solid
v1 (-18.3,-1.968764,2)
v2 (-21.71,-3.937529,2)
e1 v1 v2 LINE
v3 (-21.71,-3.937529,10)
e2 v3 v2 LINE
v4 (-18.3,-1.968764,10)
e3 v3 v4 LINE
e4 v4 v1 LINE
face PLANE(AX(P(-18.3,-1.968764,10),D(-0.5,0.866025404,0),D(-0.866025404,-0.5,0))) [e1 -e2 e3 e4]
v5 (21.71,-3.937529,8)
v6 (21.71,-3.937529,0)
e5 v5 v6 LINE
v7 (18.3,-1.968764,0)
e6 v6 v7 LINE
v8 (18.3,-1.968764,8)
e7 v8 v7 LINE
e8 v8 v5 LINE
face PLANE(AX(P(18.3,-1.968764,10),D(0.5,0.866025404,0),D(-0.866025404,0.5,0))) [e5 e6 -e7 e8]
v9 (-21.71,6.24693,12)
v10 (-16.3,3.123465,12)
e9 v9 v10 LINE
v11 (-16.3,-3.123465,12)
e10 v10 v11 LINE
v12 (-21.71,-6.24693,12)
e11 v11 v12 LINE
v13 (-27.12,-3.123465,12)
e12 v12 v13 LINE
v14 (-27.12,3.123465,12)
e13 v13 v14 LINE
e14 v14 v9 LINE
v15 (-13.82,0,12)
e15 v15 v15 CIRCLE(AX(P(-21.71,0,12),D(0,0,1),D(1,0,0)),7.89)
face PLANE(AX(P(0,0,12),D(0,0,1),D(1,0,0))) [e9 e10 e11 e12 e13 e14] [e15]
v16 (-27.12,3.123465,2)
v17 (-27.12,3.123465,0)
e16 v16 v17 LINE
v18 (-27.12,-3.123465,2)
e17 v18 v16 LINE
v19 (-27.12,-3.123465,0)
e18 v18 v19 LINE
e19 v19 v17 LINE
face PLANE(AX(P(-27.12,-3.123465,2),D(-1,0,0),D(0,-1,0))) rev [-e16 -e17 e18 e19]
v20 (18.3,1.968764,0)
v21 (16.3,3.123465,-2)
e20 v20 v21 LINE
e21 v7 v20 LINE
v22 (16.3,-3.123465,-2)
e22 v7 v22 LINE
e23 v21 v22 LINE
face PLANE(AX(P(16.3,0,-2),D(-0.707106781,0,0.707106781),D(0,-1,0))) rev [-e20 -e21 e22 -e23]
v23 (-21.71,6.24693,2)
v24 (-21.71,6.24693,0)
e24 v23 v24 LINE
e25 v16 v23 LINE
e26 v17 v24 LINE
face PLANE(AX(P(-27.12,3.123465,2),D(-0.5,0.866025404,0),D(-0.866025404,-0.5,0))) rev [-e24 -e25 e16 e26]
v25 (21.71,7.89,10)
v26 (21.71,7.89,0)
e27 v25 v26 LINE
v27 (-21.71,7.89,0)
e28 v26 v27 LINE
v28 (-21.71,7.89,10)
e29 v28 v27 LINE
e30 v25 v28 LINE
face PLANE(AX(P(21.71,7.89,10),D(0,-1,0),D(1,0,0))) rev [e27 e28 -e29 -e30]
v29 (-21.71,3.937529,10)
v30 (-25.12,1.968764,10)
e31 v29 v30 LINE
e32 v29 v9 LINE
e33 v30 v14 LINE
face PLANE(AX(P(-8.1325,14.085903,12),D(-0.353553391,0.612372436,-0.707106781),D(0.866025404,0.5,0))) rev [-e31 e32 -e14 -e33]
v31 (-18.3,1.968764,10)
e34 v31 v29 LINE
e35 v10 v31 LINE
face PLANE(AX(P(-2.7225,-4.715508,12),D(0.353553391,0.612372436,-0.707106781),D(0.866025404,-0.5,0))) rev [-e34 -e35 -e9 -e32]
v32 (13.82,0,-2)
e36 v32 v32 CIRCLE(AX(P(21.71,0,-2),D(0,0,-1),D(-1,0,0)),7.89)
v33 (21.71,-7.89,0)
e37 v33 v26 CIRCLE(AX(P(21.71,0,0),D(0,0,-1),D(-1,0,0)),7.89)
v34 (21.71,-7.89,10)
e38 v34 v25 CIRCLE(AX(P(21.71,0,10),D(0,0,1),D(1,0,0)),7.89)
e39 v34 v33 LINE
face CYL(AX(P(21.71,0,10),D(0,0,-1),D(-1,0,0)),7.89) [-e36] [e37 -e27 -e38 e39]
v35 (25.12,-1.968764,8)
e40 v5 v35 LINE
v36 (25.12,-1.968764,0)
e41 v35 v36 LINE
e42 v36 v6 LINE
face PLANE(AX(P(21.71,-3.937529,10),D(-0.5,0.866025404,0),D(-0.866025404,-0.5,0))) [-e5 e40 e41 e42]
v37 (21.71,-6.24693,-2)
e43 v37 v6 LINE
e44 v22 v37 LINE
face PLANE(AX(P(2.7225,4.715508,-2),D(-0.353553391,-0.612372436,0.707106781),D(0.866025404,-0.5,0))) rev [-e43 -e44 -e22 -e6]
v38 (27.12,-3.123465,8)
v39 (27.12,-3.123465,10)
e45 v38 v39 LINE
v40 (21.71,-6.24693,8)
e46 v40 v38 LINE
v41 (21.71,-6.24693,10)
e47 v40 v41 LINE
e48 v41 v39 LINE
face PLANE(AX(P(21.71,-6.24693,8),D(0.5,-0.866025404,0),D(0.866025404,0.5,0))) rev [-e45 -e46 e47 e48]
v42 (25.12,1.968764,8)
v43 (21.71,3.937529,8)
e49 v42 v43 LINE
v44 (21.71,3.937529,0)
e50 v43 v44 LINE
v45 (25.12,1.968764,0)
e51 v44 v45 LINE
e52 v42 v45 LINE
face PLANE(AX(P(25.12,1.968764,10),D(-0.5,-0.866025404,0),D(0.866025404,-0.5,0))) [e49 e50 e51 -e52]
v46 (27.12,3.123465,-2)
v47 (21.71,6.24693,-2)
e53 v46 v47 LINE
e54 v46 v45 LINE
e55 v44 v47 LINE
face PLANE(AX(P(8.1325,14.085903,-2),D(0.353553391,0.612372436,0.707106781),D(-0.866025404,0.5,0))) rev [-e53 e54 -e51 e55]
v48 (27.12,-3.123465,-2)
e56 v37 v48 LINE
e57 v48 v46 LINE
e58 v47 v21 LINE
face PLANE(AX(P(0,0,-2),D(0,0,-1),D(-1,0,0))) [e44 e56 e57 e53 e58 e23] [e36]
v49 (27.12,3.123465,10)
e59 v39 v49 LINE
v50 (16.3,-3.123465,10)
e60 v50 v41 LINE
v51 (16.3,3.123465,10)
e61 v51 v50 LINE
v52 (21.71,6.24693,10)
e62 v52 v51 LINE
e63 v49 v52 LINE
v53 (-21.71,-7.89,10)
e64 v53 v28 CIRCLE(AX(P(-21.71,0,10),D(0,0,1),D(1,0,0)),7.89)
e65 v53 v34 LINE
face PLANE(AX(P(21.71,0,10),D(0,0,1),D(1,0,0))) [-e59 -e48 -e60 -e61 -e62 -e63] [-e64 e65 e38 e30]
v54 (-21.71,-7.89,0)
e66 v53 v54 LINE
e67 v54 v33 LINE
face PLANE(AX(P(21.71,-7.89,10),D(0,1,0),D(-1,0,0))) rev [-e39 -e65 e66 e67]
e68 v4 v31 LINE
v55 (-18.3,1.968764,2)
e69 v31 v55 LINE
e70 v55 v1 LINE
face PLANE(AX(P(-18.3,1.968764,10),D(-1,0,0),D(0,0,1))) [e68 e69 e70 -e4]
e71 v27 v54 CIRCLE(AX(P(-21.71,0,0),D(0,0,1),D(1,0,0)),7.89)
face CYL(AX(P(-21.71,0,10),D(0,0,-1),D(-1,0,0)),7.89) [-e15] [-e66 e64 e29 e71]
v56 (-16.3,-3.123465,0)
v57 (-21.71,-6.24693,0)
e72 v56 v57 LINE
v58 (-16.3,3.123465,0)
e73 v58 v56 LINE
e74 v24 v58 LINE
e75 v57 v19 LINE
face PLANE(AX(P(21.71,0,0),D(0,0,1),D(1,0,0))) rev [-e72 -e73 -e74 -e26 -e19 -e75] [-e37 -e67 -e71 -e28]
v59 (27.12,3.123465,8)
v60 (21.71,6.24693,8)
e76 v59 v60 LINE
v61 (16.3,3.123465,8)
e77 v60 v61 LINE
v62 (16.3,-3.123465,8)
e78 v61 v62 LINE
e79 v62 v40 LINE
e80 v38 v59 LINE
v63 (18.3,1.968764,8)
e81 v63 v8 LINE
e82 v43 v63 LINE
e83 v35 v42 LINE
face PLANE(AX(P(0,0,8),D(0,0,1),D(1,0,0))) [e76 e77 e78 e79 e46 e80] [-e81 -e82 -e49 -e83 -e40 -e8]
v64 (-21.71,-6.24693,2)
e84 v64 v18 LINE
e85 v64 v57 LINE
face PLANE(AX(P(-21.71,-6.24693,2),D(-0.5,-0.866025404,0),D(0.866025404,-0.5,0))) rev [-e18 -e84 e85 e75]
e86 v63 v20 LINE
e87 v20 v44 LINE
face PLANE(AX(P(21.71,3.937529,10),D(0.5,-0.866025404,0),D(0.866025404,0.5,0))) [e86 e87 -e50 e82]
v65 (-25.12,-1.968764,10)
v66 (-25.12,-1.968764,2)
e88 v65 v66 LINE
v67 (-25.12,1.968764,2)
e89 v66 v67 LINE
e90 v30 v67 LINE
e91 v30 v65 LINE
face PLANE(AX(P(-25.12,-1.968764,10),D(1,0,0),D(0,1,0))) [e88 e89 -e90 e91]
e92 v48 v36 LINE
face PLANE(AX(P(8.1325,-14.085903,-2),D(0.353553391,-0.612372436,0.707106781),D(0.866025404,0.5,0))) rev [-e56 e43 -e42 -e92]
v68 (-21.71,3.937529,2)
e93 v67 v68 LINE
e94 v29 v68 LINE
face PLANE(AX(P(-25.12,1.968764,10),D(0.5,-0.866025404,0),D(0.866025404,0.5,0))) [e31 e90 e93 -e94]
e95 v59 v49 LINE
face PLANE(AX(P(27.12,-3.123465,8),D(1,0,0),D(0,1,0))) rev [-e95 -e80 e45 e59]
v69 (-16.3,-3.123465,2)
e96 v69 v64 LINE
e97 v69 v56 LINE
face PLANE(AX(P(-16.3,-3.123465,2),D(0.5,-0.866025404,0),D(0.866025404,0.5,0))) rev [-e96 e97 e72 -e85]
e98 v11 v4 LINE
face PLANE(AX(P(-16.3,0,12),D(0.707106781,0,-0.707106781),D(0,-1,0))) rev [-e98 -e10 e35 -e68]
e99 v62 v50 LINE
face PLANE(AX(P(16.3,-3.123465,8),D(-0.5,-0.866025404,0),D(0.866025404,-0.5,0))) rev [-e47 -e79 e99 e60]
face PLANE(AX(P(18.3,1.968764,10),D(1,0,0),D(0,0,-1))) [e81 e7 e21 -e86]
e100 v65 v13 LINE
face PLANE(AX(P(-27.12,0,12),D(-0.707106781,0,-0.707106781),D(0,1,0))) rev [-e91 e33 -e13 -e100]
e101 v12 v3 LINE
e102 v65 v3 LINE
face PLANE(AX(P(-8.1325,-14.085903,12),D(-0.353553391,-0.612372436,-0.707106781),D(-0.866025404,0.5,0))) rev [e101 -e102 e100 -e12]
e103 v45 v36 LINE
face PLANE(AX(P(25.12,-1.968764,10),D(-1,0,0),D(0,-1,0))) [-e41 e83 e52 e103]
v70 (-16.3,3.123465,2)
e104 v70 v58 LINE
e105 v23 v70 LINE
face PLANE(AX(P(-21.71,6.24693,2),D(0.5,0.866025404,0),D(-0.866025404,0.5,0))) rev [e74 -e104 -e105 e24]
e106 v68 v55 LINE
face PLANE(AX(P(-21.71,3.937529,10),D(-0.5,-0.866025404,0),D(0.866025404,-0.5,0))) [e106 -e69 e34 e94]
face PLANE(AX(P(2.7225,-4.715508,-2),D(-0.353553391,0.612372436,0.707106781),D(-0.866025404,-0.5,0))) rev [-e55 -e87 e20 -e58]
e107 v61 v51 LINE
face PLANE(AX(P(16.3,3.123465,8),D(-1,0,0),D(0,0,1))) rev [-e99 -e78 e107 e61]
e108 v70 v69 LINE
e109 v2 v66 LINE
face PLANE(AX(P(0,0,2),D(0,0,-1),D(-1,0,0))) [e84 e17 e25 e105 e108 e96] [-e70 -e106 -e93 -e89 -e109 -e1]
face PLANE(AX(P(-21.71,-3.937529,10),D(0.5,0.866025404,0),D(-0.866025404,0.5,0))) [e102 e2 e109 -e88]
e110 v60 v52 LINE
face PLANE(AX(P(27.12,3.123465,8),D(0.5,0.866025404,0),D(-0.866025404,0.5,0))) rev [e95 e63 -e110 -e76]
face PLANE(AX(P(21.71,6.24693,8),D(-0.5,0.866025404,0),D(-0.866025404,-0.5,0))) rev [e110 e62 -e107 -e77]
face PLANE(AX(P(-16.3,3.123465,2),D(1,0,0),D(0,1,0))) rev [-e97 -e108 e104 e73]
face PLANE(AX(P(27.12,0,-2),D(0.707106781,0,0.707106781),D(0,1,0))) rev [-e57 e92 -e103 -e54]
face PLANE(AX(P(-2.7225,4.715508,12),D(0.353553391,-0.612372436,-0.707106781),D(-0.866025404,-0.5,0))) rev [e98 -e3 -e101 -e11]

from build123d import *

# Parameters (mm, degrees)
BOSS_EXTRU_1_DEPTH      = 10
BOSS_EXTRU_3_START      = 2
BOSS_EXTRU_3_DEPTH      = 2
BOSS_EXTRU_4_DEPTH      = 2
ENL_V_MAT_EXTRU_2_DEPTH = 2
ENL_V_MAT_EXTRU_3_DEPTH = 2
CHANFREIN1_SIZE         = 2


with BuildPart() as part:
    # Esquisse1 → Boss.-Extru.1 (new body)
    with BuildSketch(Plane(origin=(0, 0, 0), x_dir=(0, 1, 0), z_dir=(0, 0, 1))):
        with BuildLine():
            Line((-7.89, -21.71), (-7.89, 21.71))
            ThreePointArc((-7.89, 21.71), (0, 29.6), (7.89, 21.71))
            Line((7.89, 21.71), (7.89, -21.71))
            ThreePointArc((7.89, -21.71), (0, -29.6), (-7.89, -21.71))
        make_face()
        Polygon((-1.968764418, -18.3), (-3.937528836, -21.71), (-1.968764418, -25.12), (1.968764418, -25.12), (3.937528836, -21.71), (1.968764418, -18.3), align=None, mode=Mode.SUBTRACT)
        Polygon((1.968764418, 18.3), (-1.968764418, 18.3), (-3.937528836, 21.71), (-1.968764418, 25.12), (1.968764418, 25.12), (3.937528836, 21.71), align=None, mode=Mode.SUBTRACT)
    extrude(amount=BOSS_EXTRU_1_DEPTH)

    # Esquisse3 → Boss.-Extru.3 (add)
    with BuildSketch(Plane(origin=(0, 0, 0), x_dir=(1, 0, 0), z_dir=(0, 0, -1)).offset(BOSS_EXTRU_3_START)):
        with BuildLine():
            ThreePointArc((21.71, -7.89), (27.289072504, -5.579072504), (29.6, 0))
            ThreePointArc((29.6, 0), (27.289072504, 5.579072504), (21.71, 7.89))
            ThreePointArc((21.71, 7.89), (13.82, 0), (21.71, -7.89))
        make_face()
        Polygon((21.71, -3.937528836), (18.3, -1.968764418), (18.3, 1.968764418), (21.71, 3.937528836), (25.12, 1.968764418), (25.12, -1.968764418), align=None, mode=Mode.SUBTRACT)
    extrude(amount=-BOSS_EXTRU_3_DEPTH)

    # Esquisse4 → Boss.-Extru.4 (add)
    with BuildSketch(Plane.XY.offset(10)):
        with BuildLine():
            ThreePointArc((-21.71, -7.89), (-16.130927496, -5.579072504), (-13.82, 0))
            ThreePointArc((-13.82, 0), (-16.130927496, 5.579072504), (-21.71, 7.89))
            ThreePointArc((-21.71, 7.89), (-29.6, 0), (-21.71, -7.89))
        make_face()
        Polygon((-25.12, -1.968764418), (-25.12, 1.968764418), (-21.71, 3.937528836), (-18.3, 1.968764418), (-18.3, -1.968764418), (-21.71, -3.937528836), align=None, mode=Mode.SUBTRACT)
    extrude(amount=BOSS_EXTRU_4_DEPTH)

    # Esquisse5 → Enlèv. mat.-Extru.2 (cut)
    with BuildSketch(Plane(origin=(0, 0, 0), x_dir=(1, 0, 0), z_dir=(0, 0, -1))):
        Polygon((-16.3, -3.123464956), (-16.3, 3.123464956), (-21.71, 6.246929913), (-27.12, 3.123464956), (-27.12, -3.123464956), (-21.71, -6.246929913), align=None)
    extrude(amount=-ENL_V_MAT_EXTRU_2_DEPTH, mode=Mode.SUBTRACT)

    # Esquisse6 → Enlèv. mat.-Extru.3 (cut)
    with BuildSketch(Plane.XY.offset(10)):
        Polygon((27.12, -3.123464956), (27.12, 3.123464956), (21.71, 6.246929913), (16.3, 3.123464956), (16.3, -3.123464956), (21.71, -6.246929913), align=None)
    extrude(amount=-ENL_V_MAT_EXTRU_3_DEPTH, mode=Mode.SUBTRACT)

    # Chanfrein1
    chanfrein1_edges = [part.edges().sort_by_distance(p)[0] for p in [
        (20.005, 2.953146627, -2),
        (18.3, 0, -2),
        (20.005, -2.953146627, -2),
        (23.415, -2.953146627, -2),
        (25.12, 0, -2),
        (23.415, 2.953146627, -2),
        (-25.12, 0, 12),
        (-23.415, 2.953146627, 12),
        (-20.005, 2.953146627, 12),
        (-18.3, 0, 12),
        (-20.005, -2.953146627, 12),
        (-23.415, -2.953146627, 12),
    ]]
    chamfer(chanfrein1_edges, length=CHANFREIN1_SIZE - 0.0001)  # a hair under: the kernel refuses the full size


solid = part.part
